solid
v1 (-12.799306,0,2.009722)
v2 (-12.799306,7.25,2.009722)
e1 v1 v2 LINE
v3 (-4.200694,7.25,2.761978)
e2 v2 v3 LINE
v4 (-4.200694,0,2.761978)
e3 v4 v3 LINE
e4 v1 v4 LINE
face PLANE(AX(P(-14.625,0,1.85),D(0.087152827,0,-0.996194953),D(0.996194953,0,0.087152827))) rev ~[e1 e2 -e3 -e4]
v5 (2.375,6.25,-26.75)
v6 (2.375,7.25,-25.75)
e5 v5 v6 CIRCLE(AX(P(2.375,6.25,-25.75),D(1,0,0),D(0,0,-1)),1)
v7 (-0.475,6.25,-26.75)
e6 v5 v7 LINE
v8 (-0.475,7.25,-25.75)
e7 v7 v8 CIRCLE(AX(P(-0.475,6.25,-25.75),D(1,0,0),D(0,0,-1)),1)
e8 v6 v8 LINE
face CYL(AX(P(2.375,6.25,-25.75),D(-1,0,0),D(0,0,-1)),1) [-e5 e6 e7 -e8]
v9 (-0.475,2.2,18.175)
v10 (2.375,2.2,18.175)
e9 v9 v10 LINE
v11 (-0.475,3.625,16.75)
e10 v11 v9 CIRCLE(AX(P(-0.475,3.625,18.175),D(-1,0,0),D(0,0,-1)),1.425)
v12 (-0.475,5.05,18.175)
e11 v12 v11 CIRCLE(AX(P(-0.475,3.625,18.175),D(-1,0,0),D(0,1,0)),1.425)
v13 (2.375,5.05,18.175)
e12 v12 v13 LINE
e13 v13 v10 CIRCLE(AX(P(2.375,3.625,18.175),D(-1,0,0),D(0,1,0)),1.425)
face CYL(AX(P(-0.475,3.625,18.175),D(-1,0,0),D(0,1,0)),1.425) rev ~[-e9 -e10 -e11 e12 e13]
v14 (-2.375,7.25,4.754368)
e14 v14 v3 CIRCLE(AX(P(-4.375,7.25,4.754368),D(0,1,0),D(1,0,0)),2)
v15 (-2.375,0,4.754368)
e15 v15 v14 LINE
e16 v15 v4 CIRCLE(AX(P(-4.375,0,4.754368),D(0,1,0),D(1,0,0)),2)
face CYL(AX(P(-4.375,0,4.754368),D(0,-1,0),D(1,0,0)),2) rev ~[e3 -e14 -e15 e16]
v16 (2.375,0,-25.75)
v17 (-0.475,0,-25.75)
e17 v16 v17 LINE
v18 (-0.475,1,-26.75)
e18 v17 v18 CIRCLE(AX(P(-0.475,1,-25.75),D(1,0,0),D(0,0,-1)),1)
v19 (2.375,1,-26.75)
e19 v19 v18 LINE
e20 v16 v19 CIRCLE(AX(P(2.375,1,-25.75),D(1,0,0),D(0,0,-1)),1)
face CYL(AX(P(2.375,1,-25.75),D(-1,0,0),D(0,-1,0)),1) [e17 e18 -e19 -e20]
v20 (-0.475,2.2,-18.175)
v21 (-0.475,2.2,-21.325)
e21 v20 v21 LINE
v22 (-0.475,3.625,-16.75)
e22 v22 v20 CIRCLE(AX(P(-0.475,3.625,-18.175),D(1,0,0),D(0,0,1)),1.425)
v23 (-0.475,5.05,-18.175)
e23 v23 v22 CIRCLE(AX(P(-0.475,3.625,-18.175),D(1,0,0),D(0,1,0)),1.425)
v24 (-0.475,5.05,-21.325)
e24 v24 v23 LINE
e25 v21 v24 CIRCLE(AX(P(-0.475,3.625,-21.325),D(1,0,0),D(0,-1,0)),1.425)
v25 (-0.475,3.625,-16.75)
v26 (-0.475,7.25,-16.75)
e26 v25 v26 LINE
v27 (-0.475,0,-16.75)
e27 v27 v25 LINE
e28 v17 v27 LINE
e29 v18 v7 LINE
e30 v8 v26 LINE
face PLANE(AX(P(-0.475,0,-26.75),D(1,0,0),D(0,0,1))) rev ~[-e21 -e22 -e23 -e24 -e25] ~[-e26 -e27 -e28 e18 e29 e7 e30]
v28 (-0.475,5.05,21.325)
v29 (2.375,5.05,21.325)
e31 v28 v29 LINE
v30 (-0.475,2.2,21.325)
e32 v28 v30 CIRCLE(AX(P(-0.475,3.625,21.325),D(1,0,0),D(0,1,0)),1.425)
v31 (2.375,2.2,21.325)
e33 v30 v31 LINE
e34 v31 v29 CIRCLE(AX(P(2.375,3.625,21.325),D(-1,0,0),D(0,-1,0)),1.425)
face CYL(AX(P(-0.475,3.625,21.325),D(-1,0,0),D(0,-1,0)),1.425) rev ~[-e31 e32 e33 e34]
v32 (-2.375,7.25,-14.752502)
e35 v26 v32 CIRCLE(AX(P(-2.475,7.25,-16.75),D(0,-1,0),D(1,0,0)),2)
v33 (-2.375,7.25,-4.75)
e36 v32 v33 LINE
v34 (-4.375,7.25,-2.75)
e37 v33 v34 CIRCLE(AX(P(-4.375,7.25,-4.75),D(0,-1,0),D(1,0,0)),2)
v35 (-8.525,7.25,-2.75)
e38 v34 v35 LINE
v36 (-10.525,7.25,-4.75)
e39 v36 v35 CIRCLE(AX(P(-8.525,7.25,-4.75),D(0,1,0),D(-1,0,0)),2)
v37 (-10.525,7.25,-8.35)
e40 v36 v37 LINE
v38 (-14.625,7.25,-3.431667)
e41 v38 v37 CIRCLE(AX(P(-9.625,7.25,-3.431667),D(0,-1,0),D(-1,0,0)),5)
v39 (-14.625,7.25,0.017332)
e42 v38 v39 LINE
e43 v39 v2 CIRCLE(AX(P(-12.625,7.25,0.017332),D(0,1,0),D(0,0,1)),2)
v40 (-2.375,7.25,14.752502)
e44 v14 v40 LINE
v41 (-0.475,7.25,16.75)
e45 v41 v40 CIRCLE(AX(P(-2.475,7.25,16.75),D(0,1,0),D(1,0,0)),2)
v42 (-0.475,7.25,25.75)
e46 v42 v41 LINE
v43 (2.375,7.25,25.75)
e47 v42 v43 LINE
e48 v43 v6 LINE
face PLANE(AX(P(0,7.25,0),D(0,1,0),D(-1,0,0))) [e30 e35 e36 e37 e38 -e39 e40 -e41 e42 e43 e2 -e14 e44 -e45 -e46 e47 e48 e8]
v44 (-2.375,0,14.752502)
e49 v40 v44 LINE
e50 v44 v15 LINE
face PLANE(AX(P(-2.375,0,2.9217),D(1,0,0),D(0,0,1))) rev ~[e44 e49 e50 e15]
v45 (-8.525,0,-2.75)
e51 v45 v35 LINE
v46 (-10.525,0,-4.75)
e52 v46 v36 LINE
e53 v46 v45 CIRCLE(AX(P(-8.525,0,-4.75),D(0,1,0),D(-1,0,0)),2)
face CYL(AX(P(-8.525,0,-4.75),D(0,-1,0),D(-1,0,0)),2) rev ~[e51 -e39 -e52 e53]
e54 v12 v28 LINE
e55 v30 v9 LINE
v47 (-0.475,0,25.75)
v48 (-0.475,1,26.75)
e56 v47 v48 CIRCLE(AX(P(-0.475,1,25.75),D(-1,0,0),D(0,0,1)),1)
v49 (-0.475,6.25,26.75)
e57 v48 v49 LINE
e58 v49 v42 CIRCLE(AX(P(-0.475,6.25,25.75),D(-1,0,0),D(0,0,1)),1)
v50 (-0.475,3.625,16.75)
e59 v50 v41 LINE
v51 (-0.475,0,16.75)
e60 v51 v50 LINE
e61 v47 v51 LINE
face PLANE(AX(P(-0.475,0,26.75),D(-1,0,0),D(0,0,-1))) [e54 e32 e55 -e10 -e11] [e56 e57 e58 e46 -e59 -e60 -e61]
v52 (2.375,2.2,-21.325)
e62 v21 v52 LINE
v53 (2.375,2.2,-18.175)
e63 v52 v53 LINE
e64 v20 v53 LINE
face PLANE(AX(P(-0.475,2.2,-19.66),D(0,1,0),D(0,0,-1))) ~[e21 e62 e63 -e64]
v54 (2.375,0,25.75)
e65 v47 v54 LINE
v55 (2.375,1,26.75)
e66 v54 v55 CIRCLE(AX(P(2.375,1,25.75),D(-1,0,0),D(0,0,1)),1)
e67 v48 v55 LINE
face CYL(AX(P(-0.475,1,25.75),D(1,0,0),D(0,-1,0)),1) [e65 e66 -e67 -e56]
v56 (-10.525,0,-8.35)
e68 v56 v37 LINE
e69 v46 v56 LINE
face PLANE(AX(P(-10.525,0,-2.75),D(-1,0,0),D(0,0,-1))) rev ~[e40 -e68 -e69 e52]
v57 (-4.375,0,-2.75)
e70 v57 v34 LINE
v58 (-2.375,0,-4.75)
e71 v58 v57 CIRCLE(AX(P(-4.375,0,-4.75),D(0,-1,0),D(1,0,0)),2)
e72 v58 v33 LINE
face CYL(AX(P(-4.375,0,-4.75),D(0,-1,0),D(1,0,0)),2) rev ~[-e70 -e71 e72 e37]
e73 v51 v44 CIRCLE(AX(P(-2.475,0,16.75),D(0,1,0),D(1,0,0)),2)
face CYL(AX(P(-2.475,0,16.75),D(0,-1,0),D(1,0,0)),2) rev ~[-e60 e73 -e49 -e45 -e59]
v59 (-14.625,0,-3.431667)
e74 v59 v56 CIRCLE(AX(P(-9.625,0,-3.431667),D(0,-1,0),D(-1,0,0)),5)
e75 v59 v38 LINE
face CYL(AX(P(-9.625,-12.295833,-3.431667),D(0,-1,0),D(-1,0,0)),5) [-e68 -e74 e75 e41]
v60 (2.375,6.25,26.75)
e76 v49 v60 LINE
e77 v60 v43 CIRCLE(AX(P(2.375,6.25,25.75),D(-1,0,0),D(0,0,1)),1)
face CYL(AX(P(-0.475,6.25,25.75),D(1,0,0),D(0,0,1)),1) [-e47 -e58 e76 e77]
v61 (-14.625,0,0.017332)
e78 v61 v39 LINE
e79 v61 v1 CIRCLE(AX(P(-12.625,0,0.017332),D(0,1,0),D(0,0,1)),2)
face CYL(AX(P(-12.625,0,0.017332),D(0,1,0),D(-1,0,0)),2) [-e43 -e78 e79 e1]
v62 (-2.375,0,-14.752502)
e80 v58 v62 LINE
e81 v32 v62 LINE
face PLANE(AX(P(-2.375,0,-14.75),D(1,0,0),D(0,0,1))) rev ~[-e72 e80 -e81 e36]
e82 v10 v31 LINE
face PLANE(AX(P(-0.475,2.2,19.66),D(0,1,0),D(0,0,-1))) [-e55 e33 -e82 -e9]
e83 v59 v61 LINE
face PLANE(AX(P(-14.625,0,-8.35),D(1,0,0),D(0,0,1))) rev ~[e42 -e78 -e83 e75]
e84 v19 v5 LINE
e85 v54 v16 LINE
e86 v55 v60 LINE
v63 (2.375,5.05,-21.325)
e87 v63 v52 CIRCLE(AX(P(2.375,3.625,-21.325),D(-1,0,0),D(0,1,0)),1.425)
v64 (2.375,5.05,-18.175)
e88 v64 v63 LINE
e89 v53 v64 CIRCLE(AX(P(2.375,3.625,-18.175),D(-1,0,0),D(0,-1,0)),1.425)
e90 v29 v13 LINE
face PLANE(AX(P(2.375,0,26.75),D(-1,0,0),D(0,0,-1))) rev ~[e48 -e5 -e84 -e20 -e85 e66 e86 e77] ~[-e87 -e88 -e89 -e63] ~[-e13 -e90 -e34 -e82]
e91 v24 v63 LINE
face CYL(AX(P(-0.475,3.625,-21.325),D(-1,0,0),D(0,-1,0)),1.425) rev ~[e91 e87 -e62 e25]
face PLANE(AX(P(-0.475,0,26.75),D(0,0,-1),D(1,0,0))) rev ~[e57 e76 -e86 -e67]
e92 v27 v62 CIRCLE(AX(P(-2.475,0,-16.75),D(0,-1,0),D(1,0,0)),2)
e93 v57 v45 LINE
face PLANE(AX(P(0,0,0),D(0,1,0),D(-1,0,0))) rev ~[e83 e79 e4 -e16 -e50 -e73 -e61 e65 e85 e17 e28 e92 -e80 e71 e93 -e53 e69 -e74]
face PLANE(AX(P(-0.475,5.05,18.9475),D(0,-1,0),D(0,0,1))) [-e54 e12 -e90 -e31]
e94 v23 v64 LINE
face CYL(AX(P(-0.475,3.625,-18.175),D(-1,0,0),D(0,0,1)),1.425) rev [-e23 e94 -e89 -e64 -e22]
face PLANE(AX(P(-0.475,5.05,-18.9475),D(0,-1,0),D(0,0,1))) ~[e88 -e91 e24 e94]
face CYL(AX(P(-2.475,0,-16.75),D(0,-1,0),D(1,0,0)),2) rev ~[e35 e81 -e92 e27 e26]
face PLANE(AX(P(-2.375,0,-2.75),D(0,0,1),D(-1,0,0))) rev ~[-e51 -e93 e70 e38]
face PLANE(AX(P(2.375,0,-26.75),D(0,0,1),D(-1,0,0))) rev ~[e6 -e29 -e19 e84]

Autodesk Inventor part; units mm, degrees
ref_plane "YZ Plane" through (0, 0, 0) normal (1, 0, 0) x (0, 1, 0)
ref_plane "XZ Plane" through (0, 0, 0) normal (0, 1, 0) x (-1, 0, 0)
ref_plane "XY Plane" through (0, 0, 0) normal (0, 0, 1) x (1, 0, 0)
sketch "Boceto1" plane through (0, 0, 0) normal (0, 1, 0) x (-1, 0, 0)
  line L0 (-2.375, -26.75) -> (2.375, -26.75)
  line L1 (2.375, -26.75) -> (2.375, 26.75)
  line L2 (2.375, 26.75) -> (-2.375, 26.75)
  line L3 (-2.375, 26.75) -> (-2.375, -26.75)
  line L4 (-2.375, -26.75) -> (2.375, 26.75) construction
  line L5 (2.375, -26.75) -> (-2.375, 26.75) construction
  line L6 (2.375, 26.75) -> (0.475, 26.75)
  line L7 (0.475, 26.75) -> (0.475, 14.75)
  line L8 (0.475, 14.75) -> (2.375, 14.75)
  line L9 (2.375, 14.75) -> (2.375, 26.75)
  line L10 (2.375, -26.75) -> (0.475, -26.75)
  line L11 (0.475, -26.75) -> (0.475, -14.75)
  line L12 (0.475, -14.75) -> (2.375, -14.75)
  line L13 (2.375, -14.75) -> (2.375, -26.75)
  line L14 (2.375, -26.75) -> (2.375, -2.75)
  line L15 (2.375, -2.75) -> (10.525, -2.75)
  line L16 (10.525, -2.75) -> (10.525, -8.35)
  line L17 (10.525, -8.35) -> (14.625, -8.35)
  line L18 (14.625, -8.35) -> (14.625, 1.85)
  line L19 (14.625, 1.85) -> (2.375, 1.85)
  line L20 (14.625, 1.85) -> (2.375, 2.9217)
  point P0 (0, 0)
  point P1 (2.375, 14.75)
  point P2 (0.475, -26.75)
  point P3 (2.375, -14.75)
  dimension "d0" = 4.75
  dimension "d1" = 53.5
  dimension "d2" = 1.9
  dimension "d3" = 12
  dimension "d4" = 12
  dimension "d5" = 24
  dimension "d6" = 8.15
  dimension "d7" = 5.6
  dimension "d8" = 4.1
  dimension "d9" = 10.2
  dimension "d10" = 5
extrude "Extrusión1" add sketch "Boceto1" along normal blind 7.25 contours L3 L2 L7 L8 L1 L12 L11 L0 | L1 L19 L18 L17 L16 L15 | L1 L20 L19
fillet "Empalme1" radius 2 5 edges at (-0.475, 3.625, -14.75) (-2.375, 3.625, -2.75) (-10.525, 3.625, -2.75) (-2.375, 3.625, 2.9217) (-0.475, 3.625, 14.75)
fillet "Empalme2" radius 2 1 edges at (-14.625, 3.625, 1.85)
fillet "Empalme3" radius 5 1 edges at (-14.625, 3.625, -8.35)
fillet "Empalme4" radius 1 4 edges at (0.95, 7.25, 26.75) (0.95, 0, 26.75) (0.95, 7.25, -26.75) (0.95, 0, -26.75)
sketch "Boceto2" plane through (-0.475, 0, 16.7475) normal (-1, 0, 0) x (0, 0, 1)
  arc A0 (9.0025, 0) -> (10.0025, 1) centre (9.0025, 1) ccw projected
  line L0 (10.0025, 1) -> (10.0025, 6.25) projected
  arc A1 (10.0025, 6.25) -> (9.0025, 7.25) centre (9.0025, 6.25) ccw projected
  line L1 (0, 7.25) -> (9.0025, 7.25) projected
  line L2 (0, 0) -> (0, 7.25) projected
  line L3 (0, 0) -> (9.0025, 0) projected
  arc A2 (-43.4975, 1) -> (-42.4975, 0) centre (-42.4975, 1) ccw projected
  line L4 (-42.4975, 0) -> (-33.495, 0) projected
  line L5 (-33.495, 7.25) -> (-33.495, 0) projected
  line L6 (-42.4975, 7.25) -> (-33.495, 7.25) projected
  arc A3 (-42.4975, 7.25) -> (-43.4975, 6.25) centre (-42.4975, 6.25) ccw projected
  line L7 (-43.4975, 1) -> (-43.4975, 6.25) projected
  line L8 (4.715, 2.2) -> (2.9125, 2.2)
  line L9 (2.2, 5.05) -> (4.5775, 5.05)
  line L10 (10.0025, 3.4658) -> (6.0025, 3.4658)
  line L11 (6.0025, 3.4658) -> (6.0025, 4.2)
  line L12 (6.0025, 3.4658) -> (6.0025, 5.05)
  line L13 (4.5775, 2.2) -> (1.4275, 2.2)
  line L14 (0.0025, 3.625) -> (0.0025, 3.625)
  line L15 (1.4275, 5.05) -> (6.0025, 5.05)
  line L16 (6.0025, 3.625) -> (6.0025, 3.625)
  arc A4 (4.5775, 2.2) -> (6.0025, 3.625) centre (4.5775, 3.625) ccw
  arc A5 (6.0025, 3.625) -> (4.5775, 5.05) centre (4.5775, 3.625) ccw
  arc A6 (1.4275, 5.05) -> (0.0025, 3.625) centre (1.4275, 3.625) ccw
  arc A7 (0.0025, 3.625) -> (1.4275, 2.2) centre (1.4275, 3.625) ccw
  point P0 (-16.7475, 0)
  point P1 (6.0025, 2.2)
  point P2 (0.0025, 5.05)
  point P3 (3.715, 5.05)
  point P4 (0.0025, 3.625)
  point P5 (2.9125, 2.2)
  point P6 (4.5775, 2.2)
  point P7 (2.2, 5.05)
  dimension "d17" = 2.2
  dimension "d18" = 4
  dimension "d19" = 6
  dimension "d21" = 2.85
  dimension "d22" = 1.425
extrude "Extrusión2" cut sketch "Boceto2" against normal blind 7.25 contours L8 L13 A7 A6 L15 L9 A5 A4
ref_plane "Plano de trabajo1" through (2.375, 1, 0) normal (0, 0, -1) x (-1, 0, 0)
mirror "Simetría1" about plane through (2.375, 1, 0) normal (0, 0, -1) of "Extrusión2"
properties part number "Cierre cocina"
